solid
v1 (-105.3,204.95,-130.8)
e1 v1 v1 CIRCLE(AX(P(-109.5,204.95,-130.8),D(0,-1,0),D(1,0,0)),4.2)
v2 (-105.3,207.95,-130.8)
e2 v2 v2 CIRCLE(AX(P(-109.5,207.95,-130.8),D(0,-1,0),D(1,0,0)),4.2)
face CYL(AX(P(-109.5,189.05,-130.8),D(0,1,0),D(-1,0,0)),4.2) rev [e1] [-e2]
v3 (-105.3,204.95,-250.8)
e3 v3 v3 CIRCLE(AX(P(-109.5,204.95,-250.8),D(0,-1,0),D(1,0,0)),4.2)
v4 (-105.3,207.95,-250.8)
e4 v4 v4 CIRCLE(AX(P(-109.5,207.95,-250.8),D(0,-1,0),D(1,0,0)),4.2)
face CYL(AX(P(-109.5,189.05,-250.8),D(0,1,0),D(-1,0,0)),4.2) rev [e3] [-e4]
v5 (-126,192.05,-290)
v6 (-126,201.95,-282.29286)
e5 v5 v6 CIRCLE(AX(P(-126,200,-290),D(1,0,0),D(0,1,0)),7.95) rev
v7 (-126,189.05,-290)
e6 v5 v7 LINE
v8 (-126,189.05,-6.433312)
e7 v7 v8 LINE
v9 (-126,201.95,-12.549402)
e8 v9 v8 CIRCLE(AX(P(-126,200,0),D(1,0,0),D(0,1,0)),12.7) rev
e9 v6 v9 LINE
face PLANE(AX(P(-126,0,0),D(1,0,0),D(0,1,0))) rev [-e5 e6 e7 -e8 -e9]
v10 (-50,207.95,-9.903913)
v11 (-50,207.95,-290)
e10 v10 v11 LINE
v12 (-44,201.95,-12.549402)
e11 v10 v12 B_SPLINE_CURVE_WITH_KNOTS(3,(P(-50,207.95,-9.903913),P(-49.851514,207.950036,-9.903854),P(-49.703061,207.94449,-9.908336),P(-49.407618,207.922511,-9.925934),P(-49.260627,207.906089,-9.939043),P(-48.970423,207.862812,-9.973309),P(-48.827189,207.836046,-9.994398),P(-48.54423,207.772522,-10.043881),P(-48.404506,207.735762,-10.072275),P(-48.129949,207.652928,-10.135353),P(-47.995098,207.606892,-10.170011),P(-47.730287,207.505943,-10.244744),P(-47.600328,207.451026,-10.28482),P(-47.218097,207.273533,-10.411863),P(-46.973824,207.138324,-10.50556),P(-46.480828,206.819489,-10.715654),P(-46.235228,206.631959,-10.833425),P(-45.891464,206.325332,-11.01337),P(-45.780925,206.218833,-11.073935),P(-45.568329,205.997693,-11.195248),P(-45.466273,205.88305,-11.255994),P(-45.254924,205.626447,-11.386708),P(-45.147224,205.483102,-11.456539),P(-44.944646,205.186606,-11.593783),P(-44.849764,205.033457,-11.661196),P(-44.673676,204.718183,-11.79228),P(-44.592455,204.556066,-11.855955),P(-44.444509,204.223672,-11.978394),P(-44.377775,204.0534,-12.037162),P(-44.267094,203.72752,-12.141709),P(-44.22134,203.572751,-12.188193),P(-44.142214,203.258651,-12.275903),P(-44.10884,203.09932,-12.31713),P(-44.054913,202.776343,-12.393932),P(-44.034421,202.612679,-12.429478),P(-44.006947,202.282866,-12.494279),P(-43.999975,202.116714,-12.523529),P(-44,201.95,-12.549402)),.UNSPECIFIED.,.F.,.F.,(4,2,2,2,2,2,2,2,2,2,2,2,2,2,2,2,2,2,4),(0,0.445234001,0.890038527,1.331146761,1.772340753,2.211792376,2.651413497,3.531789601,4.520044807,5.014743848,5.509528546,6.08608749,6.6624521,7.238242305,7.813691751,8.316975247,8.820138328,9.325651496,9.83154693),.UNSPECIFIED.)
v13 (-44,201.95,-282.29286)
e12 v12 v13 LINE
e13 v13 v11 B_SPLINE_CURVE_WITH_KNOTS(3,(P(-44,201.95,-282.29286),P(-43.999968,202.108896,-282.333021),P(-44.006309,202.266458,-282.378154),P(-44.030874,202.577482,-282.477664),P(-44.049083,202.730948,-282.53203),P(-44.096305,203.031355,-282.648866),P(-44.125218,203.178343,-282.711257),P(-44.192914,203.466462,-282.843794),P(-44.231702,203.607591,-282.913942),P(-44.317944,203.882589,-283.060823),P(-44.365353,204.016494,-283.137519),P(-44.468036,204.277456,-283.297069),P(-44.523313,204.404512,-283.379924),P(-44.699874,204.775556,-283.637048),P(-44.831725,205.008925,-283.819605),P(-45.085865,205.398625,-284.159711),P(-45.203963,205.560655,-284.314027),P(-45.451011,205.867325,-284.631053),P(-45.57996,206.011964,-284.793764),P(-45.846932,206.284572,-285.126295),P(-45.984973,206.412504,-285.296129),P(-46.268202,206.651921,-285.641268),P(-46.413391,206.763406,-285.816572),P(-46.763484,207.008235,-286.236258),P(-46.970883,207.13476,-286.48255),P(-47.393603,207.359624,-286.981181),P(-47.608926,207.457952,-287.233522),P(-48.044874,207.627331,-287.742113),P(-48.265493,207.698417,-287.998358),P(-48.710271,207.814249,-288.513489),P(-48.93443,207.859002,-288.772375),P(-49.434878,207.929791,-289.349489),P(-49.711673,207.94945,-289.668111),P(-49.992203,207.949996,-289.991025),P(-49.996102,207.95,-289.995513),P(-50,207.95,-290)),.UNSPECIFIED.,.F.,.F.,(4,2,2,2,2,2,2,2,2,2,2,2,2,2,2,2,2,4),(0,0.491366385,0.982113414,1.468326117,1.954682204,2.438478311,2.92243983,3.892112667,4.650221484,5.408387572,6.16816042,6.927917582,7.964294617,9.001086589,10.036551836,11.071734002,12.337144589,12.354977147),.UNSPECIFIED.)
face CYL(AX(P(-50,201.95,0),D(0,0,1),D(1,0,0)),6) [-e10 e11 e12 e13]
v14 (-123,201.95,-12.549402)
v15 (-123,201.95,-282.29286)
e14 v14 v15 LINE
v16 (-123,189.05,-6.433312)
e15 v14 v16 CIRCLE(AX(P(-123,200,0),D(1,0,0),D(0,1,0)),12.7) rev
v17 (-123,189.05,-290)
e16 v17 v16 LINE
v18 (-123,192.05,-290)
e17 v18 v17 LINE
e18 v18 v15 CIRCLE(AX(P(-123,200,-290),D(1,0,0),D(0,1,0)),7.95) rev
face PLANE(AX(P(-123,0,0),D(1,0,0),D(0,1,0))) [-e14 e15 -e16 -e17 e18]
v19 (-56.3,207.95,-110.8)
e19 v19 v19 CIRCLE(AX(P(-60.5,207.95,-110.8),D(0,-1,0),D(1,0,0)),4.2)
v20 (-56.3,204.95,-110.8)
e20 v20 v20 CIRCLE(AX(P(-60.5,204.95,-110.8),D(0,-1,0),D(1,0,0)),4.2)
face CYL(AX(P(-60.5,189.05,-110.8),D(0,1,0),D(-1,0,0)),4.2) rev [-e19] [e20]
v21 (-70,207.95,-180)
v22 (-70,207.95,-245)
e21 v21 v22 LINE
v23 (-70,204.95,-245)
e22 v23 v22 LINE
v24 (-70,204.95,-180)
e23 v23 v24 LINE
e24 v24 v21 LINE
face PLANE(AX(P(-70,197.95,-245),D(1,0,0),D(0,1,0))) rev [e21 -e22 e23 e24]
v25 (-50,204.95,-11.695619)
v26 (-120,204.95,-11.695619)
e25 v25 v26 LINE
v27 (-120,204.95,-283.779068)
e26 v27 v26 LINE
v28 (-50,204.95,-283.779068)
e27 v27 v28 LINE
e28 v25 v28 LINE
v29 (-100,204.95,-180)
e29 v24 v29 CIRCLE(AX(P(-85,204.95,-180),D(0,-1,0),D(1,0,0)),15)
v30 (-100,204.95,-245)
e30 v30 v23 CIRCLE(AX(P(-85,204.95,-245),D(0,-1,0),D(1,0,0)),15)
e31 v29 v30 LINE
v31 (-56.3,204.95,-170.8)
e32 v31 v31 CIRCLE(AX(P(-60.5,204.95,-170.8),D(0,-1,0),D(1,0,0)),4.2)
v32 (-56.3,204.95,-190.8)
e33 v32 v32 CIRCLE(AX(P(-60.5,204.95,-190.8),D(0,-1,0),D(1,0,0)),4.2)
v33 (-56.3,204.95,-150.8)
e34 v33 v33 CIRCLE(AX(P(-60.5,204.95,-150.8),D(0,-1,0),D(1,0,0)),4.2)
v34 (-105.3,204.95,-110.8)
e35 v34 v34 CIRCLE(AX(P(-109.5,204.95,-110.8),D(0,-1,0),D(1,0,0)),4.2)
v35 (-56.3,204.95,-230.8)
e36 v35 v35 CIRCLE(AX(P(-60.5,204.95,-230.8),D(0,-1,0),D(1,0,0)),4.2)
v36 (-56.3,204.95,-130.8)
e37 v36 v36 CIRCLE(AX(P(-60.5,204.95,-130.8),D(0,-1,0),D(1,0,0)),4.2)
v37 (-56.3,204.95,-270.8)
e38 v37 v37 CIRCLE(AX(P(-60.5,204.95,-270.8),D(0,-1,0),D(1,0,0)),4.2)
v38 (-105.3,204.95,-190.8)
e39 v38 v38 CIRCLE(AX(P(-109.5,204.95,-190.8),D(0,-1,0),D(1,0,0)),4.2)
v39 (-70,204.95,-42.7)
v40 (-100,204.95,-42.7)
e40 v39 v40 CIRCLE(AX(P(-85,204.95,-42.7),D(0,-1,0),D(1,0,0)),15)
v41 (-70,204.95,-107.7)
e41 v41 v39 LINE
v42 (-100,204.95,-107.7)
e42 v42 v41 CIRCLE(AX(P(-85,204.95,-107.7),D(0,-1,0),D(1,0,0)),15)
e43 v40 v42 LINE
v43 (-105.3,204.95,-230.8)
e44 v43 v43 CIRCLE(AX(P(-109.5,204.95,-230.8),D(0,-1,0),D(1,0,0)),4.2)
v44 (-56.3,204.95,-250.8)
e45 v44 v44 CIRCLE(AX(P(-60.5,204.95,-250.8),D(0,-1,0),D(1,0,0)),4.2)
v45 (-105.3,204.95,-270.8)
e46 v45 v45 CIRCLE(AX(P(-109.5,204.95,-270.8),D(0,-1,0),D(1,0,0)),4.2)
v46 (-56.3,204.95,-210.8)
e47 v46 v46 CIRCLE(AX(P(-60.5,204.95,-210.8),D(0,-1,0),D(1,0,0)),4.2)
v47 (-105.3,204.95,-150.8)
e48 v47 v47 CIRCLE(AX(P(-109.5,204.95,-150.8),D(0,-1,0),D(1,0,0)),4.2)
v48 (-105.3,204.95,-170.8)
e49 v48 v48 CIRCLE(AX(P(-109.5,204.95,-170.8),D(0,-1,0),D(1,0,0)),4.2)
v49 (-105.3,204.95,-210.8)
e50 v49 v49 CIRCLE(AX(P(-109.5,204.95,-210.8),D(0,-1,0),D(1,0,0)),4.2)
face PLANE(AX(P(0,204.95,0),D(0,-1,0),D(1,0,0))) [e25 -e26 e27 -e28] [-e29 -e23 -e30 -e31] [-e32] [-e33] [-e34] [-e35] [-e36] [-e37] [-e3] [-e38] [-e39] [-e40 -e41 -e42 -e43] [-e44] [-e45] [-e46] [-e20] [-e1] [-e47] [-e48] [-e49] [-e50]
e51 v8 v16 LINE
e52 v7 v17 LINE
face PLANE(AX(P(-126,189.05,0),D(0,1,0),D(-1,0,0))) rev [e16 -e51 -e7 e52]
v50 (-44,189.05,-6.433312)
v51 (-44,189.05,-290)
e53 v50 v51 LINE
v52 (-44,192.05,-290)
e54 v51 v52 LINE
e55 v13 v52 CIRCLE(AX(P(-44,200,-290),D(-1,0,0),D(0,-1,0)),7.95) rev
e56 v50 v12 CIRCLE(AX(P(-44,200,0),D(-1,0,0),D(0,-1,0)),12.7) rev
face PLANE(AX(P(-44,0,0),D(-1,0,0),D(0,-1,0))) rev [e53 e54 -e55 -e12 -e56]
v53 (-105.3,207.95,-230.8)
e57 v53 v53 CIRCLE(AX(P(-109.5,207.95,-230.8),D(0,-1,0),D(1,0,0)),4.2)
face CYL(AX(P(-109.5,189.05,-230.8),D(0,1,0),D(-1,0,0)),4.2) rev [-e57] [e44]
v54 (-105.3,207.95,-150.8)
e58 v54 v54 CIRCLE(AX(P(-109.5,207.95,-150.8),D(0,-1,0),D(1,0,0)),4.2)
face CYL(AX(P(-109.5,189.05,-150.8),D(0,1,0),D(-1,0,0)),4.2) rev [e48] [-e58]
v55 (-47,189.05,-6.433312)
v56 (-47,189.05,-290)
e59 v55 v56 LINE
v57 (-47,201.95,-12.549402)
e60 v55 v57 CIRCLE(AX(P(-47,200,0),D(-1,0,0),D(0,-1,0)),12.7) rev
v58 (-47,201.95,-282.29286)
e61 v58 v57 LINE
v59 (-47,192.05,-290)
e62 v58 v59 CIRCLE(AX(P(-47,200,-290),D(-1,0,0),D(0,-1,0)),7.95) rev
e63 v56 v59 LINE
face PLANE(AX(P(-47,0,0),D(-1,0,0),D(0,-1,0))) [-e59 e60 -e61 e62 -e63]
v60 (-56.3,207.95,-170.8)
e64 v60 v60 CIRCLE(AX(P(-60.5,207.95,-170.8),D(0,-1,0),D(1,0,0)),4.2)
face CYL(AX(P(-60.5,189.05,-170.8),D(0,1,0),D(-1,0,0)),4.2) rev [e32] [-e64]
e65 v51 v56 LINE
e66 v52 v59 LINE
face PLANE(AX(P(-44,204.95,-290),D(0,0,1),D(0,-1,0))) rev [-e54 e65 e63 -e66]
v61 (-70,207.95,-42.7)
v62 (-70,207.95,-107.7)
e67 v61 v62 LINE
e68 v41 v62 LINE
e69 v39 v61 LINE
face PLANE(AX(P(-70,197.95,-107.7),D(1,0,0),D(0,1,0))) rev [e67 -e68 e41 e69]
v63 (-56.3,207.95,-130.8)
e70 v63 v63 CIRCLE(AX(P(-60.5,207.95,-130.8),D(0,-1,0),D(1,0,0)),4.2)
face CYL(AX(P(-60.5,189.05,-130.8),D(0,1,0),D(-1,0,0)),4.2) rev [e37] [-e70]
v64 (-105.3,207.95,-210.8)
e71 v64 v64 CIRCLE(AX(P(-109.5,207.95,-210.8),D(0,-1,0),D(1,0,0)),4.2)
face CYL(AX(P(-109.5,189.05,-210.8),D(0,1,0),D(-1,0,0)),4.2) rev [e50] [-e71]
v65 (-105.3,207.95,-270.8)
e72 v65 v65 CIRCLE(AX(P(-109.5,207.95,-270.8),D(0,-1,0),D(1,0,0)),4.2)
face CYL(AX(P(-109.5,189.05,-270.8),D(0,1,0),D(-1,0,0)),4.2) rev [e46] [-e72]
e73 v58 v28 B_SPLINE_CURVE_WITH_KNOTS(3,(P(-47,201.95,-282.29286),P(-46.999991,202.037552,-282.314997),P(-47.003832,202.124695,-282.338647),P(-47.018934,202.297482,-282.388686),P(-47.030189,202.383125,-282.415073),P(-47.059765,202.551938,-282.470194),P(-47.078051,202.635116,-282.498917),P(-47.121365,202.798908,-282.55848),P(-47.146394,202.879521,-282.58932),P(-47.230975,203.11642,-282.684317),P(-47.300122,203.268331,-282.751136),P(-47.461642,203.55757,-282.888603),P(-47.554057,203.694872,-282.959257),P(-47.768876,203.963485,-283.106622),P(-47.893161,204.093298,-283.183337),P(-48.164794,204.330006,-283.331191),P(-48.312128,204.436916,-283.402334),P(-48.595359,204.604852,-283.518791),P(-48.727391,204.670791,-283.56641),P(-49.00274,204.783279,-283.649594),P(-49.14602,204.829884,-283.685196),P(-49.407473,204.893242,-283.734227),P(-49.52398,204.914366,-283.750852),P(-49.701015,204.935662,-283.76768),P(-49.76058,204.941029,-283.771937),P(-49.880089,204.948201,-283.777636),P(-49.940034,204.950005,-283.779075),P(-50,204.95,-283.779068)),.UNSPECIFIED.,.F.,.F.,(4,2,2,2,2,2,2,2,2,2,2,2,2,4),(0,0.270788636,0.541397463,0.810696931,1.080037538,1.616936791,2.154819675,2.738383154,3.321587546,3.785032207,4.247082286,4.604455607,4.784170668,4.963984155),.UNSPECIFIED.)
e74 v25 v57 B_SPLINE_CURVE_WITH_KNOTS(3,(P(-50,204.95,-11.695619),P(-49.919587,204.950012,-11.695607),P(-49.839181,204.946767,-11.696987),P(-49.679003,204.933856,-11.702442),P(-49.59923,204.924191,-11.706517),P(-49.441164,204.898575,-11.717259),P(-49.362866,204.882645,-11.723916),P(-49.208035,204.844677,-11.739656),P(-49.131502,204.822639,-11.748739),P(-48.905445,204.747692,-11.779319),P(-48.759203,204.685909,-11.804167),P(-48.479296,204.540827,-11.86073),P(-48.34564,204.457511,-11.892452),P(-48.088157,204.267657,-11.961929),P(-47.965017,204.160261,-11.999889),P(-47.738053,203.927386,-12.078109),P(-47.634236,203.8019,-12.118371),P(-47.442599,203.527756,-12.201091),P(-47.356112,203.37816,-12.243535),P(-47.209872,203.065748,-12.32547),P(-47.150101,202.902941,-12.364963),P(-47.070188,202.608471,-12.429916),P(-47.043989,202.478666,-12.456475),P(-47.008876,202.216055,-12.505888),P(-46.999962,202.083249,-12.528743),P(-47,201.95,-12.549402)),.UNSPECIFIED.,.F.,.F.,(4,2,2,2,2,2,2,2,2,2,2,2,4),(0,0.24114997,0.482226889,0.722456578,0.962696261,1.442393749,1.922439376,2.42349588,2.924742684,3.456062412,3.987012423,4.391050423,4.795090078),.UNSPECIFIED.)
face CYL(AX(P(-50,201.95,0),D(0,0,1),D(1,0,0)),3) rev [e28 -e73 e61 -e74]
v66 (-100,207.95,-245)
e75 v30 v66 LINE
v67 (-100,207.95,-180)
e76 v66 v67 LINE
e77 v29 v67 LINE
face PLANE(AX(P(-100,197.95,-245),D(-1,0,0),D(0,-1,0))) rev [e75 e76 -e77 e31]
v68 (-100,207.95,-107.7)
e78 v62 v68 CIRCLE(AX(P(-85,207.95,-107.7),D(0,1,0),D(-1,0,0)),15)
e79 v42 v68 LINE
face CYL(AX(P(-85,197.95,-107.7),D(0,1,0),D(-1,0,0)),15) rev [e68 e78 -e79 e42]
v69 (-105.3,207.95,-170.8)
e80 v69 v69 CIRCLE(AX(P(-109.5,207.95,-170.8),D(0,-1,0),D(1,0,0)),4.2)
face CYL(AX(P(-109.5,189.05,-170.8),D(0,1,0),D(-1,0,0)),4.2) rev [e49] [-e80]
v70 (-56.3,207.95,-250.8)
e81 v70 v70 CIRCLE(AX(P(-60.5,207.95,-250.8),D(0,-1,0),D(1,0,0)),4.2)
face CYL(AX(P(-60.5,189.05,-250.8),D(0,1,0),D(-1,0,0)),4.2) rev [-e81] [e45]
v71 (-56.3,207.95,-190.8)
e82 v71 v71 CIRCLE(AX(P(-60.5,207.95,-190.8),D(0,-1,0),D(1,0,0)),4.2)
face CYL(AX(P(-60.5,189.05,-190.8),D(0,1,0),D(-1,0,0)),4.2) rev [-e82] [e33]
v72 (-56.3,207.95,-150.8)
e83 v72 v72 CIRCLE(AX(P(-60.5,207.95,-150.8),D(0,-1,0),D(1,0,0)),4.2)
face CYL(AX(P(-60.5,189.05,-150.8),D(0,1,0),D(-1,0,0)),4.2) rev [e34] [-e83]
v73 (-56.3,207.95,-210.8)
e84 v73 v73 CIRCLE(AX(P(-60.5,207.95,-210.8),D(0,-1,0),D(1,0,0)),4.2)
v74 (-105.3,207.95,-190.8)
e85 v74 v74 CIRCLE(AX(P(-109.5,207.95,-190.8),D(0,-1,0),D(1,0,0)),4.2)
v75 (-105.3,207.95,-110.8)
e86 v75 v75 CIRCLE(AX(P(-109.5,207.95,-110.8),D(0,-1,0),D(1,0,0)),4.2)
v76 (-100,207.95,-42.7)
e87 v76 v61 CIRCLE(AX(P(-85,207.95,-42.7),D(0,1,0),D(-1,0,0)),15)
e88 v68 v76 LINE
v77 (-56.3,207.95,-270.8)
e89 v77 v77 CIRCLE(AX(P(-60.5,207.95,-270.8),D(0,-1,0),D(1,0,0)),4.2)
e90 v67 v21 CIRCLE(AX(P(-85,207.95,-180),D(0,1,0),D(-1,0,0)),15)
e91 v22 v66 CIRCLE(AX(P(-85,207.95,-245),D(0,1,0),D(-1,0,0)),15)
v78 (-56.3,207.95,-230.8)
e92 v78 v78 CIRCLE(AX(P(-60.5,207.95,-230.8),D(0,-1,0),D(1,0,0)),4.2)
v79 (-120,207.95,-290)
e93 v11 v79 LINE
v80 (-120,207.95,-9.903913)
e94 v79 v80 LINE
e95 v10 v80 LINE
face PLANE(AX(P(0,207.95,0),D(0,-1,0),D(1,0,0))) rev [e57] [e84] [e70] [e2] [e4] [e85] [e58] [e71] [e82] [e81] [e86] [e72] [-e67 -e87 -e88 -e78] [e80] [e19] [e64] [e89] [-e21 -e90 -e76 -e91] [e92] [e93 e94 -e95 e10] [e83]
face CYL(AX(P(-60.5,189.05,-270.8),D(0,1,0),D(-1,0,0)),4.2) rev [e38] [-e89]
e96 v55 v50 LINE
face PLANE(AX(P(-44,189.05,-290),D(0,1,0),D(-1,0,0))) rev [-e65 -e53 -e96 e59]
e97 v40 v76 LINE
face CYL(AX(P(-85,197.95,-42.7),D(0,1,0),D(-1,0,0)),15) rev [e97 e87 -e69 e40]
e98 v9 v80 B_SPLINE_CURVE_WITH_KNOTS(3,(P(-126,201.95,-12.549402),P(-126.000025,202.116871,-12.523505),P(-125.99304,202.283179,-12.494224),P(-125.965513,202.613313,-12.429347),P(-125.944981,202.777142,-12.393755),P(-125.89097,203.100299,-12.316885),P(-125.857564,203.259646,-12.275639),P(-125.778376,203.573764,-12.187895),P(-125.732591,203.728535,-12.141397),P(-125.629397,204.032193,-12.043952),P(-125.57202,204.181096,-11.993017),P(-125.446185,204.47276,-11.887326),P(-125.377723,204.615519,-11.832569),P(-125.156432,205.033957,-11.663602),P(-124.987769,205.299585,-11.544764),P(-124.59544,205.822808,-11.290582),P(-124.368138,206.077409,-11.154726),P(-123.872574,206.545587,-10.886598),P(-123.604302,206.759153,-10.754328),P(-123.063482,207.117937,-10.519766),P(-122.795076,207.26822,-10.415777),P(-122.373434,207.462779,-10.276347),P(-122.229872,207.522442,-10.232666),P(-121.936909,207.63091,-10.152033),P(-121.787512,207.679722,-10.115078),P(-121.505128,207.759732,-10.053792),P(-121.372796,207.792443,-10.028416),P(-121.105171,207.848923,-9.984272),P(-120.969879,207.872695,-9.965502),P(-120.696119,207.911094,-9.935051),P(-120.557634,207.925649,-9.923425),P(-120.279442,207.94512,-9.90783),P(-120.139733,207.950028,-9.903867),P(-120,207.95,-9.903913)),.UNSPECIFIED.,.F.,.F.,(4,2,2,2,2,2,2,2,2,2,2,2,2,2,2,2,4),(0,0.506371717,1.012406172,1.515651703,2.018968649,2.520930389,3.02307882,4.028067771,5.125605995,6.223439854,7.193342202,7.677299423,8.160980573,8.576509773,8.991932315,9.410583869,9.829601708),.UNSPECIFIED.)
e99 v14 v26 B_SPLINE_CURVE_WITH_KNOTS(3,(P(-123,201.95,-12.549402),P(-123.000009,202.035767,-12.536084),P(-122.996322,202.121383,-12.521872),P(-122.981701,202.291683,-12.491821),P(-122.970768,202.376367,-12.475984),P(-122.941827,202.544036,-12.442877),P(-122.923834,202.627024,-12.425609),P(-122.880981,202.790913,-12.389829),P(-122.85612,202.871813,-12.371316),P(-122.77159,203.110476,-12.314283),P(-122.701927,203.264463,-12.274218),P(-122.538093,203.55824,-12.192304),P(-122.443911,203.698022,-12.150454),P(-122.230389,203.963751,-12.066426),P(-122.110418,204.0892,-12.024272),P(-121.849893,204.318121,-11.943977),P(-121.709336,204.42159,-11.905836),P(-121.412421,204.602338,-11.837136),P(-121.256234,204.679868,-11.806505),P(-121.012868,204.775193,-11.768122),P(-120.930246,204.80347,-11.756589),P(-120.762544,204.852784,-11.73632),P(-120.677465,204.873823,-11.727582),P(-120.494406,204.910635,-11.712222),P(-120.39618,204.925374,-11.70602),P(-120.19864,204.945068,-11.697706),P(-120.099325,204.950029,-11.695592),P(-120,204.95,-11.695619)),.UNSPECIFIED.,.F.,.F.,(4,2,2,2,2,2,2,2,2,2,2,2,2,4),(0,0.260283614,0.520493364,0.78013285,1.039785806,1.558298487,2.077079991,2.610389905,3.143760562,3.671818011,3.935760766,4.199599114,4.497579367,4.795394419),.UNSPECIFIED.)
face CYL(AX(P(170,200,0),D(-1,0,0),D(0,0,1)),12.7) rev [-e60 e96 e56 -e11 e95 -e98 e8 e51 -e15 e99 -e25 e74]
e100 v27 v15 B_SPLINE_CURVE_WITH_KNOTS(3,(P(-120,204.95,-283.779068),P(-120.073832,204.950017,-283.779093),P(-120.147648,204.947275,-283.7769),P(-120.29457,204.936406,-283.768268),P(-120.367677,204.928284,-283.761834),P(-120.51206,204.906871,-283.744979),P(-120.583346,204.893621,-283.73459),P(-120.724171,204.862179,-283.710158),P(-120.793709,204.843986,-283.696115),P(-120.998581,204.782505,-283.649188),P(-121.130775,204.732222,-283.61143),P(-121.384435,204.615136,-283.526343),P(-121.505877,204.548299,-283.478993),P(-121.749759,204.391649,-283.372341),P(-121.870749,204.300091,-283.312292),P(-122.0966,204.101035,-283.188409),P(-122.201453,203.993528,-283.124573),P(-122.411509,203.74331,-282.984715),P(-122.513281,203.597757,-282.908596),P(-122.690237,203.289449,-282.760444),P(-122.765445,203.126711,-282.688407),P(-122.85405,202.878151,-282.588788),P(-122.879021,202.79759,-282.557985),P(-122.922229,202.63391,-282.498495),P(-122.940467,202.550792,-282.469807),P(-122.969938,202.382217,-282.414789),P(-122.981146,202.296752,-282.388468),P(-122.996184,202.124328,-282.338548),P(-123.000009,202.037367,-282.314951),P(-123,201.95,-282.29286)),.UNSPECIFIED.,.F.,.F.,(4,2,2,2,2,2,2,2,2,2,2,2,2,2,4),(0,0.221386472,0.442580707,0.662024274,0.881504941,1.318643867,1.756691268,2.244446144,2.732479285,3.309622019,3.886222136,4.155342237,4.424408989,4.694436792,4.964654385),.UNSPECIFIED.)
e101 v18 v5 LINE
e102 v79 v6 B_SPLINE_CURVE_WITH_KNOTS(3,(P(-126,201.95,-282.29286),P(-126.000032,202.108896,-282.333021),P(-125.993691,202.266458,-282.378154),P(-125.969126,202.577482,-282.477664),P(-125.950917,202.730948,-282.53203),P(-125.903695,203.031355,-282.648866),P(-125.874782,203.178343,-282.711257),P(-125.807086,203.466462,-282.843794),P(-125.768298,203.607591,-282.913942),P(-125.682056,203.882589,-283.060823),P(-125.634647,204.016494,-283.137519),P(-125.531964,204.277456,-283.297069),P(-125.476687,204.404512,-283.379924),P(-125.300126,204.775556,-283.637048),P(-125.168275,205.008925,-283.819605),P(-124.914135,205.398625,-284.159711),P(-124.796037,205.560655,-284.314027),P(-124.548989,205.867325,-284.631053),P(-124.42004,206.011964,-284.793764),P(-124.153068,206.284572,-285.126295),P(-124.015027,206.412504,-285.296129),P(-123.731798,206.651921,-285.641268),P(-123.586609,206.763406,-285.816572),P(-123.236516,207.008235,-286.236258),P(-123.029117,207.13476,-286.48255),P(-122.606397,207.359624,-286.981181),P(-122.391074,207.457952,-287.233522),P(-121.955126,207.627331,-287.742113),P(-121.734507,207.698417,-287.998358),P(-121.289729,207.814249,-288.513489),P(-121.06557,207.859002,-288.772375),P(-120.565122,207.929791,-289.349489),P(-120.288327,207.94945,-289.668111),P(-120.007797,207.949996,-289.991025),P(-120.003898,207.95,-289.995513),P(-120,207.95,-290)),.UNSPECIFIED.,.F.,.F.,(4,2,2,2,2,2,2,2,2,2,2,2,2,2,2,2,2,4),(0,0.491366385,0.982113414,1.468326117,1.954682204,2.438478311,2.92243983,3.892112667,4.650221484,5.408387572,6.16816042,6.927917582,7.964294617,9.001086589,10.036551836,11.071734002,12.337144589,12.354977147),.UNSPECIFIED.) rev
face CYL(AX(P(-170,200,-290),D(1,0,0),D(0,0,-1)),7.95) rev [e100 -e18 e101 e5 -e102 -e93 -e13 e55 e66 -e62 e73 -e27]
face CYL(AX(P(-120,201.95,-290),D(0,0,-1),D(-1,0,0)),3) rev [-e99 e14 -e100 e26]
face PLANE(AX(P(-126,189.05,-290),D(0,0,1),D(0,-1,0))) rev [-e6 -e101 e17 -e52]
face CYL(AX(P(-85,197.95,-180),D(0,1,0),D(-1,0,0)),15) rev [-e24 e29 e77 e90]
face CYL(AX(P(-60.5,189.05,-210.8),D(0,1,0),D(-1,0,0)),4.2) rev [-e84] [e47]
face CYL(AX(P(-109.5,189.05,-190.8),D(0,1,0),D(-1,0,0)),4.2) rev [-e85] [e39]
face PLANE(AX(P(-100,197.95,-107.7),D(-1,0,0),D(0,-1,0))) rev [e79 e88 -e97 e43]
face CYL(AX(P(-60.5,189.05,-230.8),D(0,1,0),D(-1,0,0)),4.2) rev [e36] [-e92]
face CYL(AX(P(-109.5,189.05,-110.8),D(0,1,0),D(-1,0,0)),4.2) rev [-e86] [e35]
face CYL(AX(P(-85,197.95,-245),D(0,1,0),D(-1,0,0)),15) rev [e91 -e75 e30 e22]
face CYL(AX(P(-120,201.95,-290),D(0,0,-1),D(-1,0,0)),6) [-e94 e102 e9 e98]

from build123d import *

# Parameters (mm, degrees)
SKETCH1_W                   = 70
SKETCH1_H                   = 290
BASE_FLANGE1_DEPTH          = 3
SM_EDGE_FLANGE_1_DEPTH      = 290
SM_EDGE_FLANGE_1_BEND_DEPTH = 290
INDENT1_START               = -127
INDENT1_DEPTH               = 84
INDENT1_START_2             = -123.729611107
INDENT1_2_DEPTH             = 77.459222009
INDENT1_3_DEPTH             = 0.729611107
INDENT1_START_3             = -47
INDENT1_4_DEPTH             = 0.729610902
INDENT1_START_4             = -50.0000001
INDENT1_5_DEPTH             = 6.0000001
INDENT1_START_5             = -126
INDENT1_6_DEPTH             = 6
INDENT1_START_6             = -290
INDENT1_7_DEPTH             = 6.65
INDENT2_START               = -127
INDENT2_DEPTH               = 84
INDENT2_START_2             = -11.0000001
INDENT2_2_DEPTH             = 11.0000001
INDENT2_START_3             = -126
INDENT2_3_DEPTH             = 82
CUT_EXTRUDE1_DEPTH          = 317.754179273
CUT_EXTRUDE1_DEPTH_BACK     = 317.754179273
SKETCH12_R                  = 4.2
CUT_EXTRUDE2_DEPTH          = 10


with BuildPart() as part:
    # Base-Flange1: sheet metal written as solids
    # Sketch1 → Base-Flange1 (new body)
    with BuildSketch(Plane(origin=(0, 207.95, 0), x_dir=(1, 0, 0), z_dir=(0, 1, 0))):
        with Locations((-85, 145)):
            Rectangle(SKETCH1_W, SKETCH1_H)
    extrude(amount=-BASE_FLANGE1_DEPTH)

    # 邊線-凸緣1: sheet metal written as solids
    # 邊線-凸緣1 section (on a plane across the edge) → 邊線-凸緣1 (add)
    with BuildSketch(Plane(origin=(-47, 204.95, -290), x_dir=(-1, 0, 0), z_dir=(0, 0, 1))):
        with BuildLine():
            Line((-3, 3), (-3, 15.9))
            Line((-3, 15.9), (0, 15.9))
            Line((0, 15.9), (0, 3))
            ThreePointArc((0, 3), (0.878679656, 0.878679656), (3, 0))
            Line((3, 0), (3, -3))
            ThreePointArc((3, -3), (-1.242640687, -1.242640687), (-3, 3))
        make_face()
    extrude(amount=SM_EDGE_FLANGE_1_DEPTH)

    # 邊線-凸緣1 section 2 (on a plane across the edge) → 邊線-凸緣1 bend (add)
    with BuildSketch(Plane(origin=(-123, 204.95, 0), x_dir=(1, 0, 0), z_dir=(0, 0, -1))):
        with BuildLine():
            Line((-3, 3), (-3, 15.9))
            Line((-3, 15.9), (0, 15.9))
            Line((0, 15.9), (0, 3))
            ThreePointArc((0, 3), (0.878679656, 0.878679656), (3, 0))
            Line((3, 0), (3, -3))
            ThreePointArc((3, -3), (-1.242640687, -1.242640687), (-3, 3))
        make_face()
    extrude(amount=SM_EDGE_FLANGE_1_BEND_DEPTH)

    # Indent1: read off the stored shape, not the designer's step
    # Indent1 outline → Indent1 (cut)
    with BuildSketch(Plane.YZ.offset(INDENT1_START)):
        with BuildLine():
            Line((192.05, -290), (207.95, -290))
            ThreePointArc((207.95, -290), (200, -282.05), (192.05, -290))
        make_face()
    extrude(amount=INDENT1_DEPTH, mode=Mode.SUBTRACT)

    # Indent2: read off the stored shape, not the designer's step
    # Indent2 outline → Indent2 (cut)
    with BuildSketch(Plane.YZ.offset(INDENT2_START)):
        with BuildLine():
            ThreePointArc((189.05, -6.433311744), (197.7062633, -12.491147744), (207.950014124, -9.903902031))
            Line((207.950014124, -9.903902031), (209, -9.061062257))
            Line((209, -9.061062257), (209, 1))
            Line((209, 1), (188, 1))
            Line((188, 1), (188, 0))
            Line((188, 0), (188, -4.64612958))
            Line((188, -4.64612958), (189.05, -6.433311744))
        make_face()
    extrude(amount=INDENT2_DEPTH, mode=Mode.SUBTRACT)

    # Sketch12 → Cut-Extrude1 (cut, two sides: drawn at the far end of the back side and taken through both)
    with BuildSketch(Plane(origin=(0, 207.95, 0), x_dir=(1, 0, 0), z_dir=(0, 1, 0)).offset(-CUT_EXTRUDE1_DEPTH_BACK)):
        with Locations((-109.5, 270.8)):
            Circle(SKETCH12_R)
        with Locations((-60.5, 270.8)):
            Circle(SKETCH12_R)
        with Locations((-60.5, 250.8)):
            Circle(SKETCH12_R)
        with Locations((-109.5, 250.8)):
            Circle(SKETCH12_R)
        with Locations((-60.5, 230.8)):
            Circle(SKETCH12_R)
        with Locations((-109.5, 230.8)):
            Circle(SKETCH12_R)
        with Locations((-60.5, 210.8)):
            Circle(SKETCH12_R)
        with Locations((-109.5, 210.8)):
            Circle(SKETCH12_R)
        with Locations((-60.5, 190.8)):
            Circle(SKETCH12_R)
        with Locations((-109.5, 190.8)):
            Circle(SKETCH12_R)
        with Locations((-60.5, 170.8)):
            Circle(SKETCH12_R)
        with Locations((-109.5, 170.8)):
            Circle(SKETCH12_R)
        with Locations((-60.5, 150.8)):
            Circle(SKETCH12_R)
        with Locations((-109.5, 150.8)):
            Circle(SKETCH12_R)
        with Locations((-60.5, 130.8)):
            Circle(SKETCH12_R)
        with Locations((-109.5, 130.8)):
            Circle(SKETCH12_R)
        with Locations((-60.5, 110.8)):
            Circle(SKETCH12_R)
        with Locations((-109.5, 110.8)):
            Circle(SKETCH12_R)
    extrude(amount=CUT_EXTRUDE1_DEPTH + CUT_EXTRUDE1_DEPTH_BACK, mode=Mode.SUBTRACT)

    # Sketch13 → Cut-Extrude2 (cut)
    with BuildSketch(Plane(origin=(0, 207.95, 0), x_dir=(1, 0, 0), z_dir=(0, 1, 0))):
        with BuildLine():
            Line((-70, 107.7), (-70, 42.7))
            ThreePointArc((-70, 42.7), (-85, 27.7), (-100, 42.7))
            Line((-100, 42.7), (-100, 107.7))
            ThreePointArc((-100, 107.7), (-85, 122.7), (-70, 107.7))
        make_face()
        with BuildLine():
            Line((-70, 245), (-70, 180))
            ThreePointArc((-70, 180), (-85, 165), (-100, 180))
            Line((-100, 180), (-100, 245))
            ThreePointArc((-100, 245), (-85, 260), (-70, 245))
        make_face()
    extrude(amount=-CUT_EXTRUDE2_DEPTH, mode=Mode.SUBTRACT)


with BuildPart() as body_2:
    # Indent1 2 outline → Indent1 2 (new body)
    with BuildSketch(Plane.YZ.offset(INDENT1_START_2)):
        with BuildLine():
            Line((204.95, -285.559279338), (204.95, -290))
            Line((204.95, -290), (206.65, -290))
            ThreePointArc((206.65, -290), (206.210475022, -287.622501314), (204.95, -285.559279338))
        make_face()
    extrude(amount=INDENT1_2_DEPTH)

    # Indent1 3 outline → Indent1 3 (add)
    with BuildSketch(Plane.YZ.offset(INDENT1_START_2)):
        with BuildLine():
            Line((193.35, -290), (204.95, -290))
            Line((204.95, -290), (204.95, -285.559279338))
            ThreePointArc((204.95, -285.559279338), (197.622501314, -283.789524978), (193.35, -290))
        make_face()
    extrude(amount=INDENT1_3_DEPTH)

    # Indent1 4 outline → Indent1 4 (add)
    with BuildSketch(Plane.YZ.offset(INDENT1_START_3)):
        with BuildLine():
            Line((193.35, -290), (204.95, -290))
            Line((204.95, -290), (204.95, -285.559279338))
            ThreePointArc((204.95, -285.559279338), (197.622501314, -283.789524978), (193.35, -290))
        make_face()
    extrude(amount=INDENT1_4_DEPTH)

    # Indent1 5 outline → Indent1 5 (add)
    with BuildSketch(Plane.YZ.offset(INDENT1_START_4)):
        with BuildLine():
            Line((193.35, -290), (206.65, -290))
            ThreePointArc((206.65, -290), (200, -283.35), (193.35, -290))
        make_face()
    extrude(amount=INDENT1_5_DEPTH)

    # Indent1 6 outline → Indent1 6 (add)
    with BuildSketch(Plane.YZ.offset(INDENT1_START_5)):
        with BuildLine():
            Line((193.35, -290), (206.65, -290))
            ThreePointArc((206.65, -290), (200, -283.35), (193.35, -290))
        make_face()
    extrude(amount=INDENT1_6_DEPTH)

    # Indent1 7 outline → Indent1 7 (cut)
    with BuildSketch(Plane.XY.offset(INDENT1_START_6)):
        with BuildLine():
            Line((-47, 192), (-47, 201.95))
            ThreePointArc((-47, 201.95), (-47.878679656, 204.071320344), (-50, 204.95))
            Line((-50, 204.95), (-50.0000001, 192))
            Line((-50.0000001, 192), (-47, 192))
        make_face()
        with BuildLine():
            Line((-123, 192), (-120, 192))
            Line((-120, 192), (-120, 204.95))
            ThreePointArc((-120, 204.95), (-122.121320344, 204.071320344), (-123, 201.95))
            Line((-123, 201.95), (-123, 192))
        make_face()
        with BuildLine():
            ThreePointArc((-46.270396534, 206.650006169), (-44.597333029, 204.559825589), (-44, 201.95))
            Line((-44, 201.95), (-44, 208))
            Line((-44, 208), (-47.971644239, 208))
            Line((-47.971644239, 208), (-46.270396534, 206.650006169))
        make_face()
        with BuildLine():
            Line((-126, 208), (-126, 201.95))
            ThreePointArc((-126, 201.95), (-125.402668364, 204.559822705), (-123.729608483, 206.650002187))
            Line((-123.729608483, 206.650002187), (-122.028359489, 208))
            Line((-122.028359489, 208), (-126, 208))
        make_face()
    extrude(amount=INDENT1_7_DEPTH, mode=Mode.SUBTRACT)


with BuildPart() as body_3:
    # Indent2 2 outline → Indent2 2 (new body)
    with BuildSketch(Plane.XY.offset(INDENT2_START_2)):
        with BuildLine():
            Line((-44, 189.05), (-44, 201.95))
            ThreePointArc((-44, 201.95), (-45.757359313, 206.192640687), (-50, 207.95))
            Line((-50, 207.95), (-120, 207.95))
            ThreePointArc((-120, 207.95), (-124.242640687, 206.192640687), (-126, 201.95))
            Line((-126, 201.95), (-126, 189.05))
            Line((-126, 189.05), (-123, 189.05))
            Line((-123, 189.05), (-123, 201.95))
            ThreePointArc((-123, 201.95), (-122.121320344, 204.071320344), (-120, 204.95))
            Line((-120, 204.95), (-50, 204.95))
            ThreePointArc((-50, 204.95), (-47.878679656, 204.071320344), (-47, 201.95))
            Line((-47, 201.95), (-47, 189.05))
            Line((-47, 189.05), (-44, 189.05))
        make_face()
    extrude(amount=INDENT2_2_DEPTH)

    # Indent2 3 outline → Indent2 3 (cut)
    with BuildSketch(Plane.YZ.offset(INDENT2_START_3)):
        with BuildLine():
            Line((207.95, -11.0000001), (207.950016725, -7.602449216))
            ThreePointArc((207.950016725, -7.602449216), (204.322791843, -10.115012145), (200.000000001, -11))
            Line((200.000000001, -11), (207.95, -11.0000001))
        make_face()
        with BuildLine():
            Line((189.05, -11.0000001), (200.000000001, -11))
            ThreePointArc((200.000000001, -11), (192.601479194, -8.140140655), (189.05, -1.047616342))
            Line((189.05, -1.047616342), (189.05, -11.0000001))
        make_face()
    extrude(amount=INDENT2_3_DEPTH, mode=Mode.SUBTRACT)


solid = part.part
